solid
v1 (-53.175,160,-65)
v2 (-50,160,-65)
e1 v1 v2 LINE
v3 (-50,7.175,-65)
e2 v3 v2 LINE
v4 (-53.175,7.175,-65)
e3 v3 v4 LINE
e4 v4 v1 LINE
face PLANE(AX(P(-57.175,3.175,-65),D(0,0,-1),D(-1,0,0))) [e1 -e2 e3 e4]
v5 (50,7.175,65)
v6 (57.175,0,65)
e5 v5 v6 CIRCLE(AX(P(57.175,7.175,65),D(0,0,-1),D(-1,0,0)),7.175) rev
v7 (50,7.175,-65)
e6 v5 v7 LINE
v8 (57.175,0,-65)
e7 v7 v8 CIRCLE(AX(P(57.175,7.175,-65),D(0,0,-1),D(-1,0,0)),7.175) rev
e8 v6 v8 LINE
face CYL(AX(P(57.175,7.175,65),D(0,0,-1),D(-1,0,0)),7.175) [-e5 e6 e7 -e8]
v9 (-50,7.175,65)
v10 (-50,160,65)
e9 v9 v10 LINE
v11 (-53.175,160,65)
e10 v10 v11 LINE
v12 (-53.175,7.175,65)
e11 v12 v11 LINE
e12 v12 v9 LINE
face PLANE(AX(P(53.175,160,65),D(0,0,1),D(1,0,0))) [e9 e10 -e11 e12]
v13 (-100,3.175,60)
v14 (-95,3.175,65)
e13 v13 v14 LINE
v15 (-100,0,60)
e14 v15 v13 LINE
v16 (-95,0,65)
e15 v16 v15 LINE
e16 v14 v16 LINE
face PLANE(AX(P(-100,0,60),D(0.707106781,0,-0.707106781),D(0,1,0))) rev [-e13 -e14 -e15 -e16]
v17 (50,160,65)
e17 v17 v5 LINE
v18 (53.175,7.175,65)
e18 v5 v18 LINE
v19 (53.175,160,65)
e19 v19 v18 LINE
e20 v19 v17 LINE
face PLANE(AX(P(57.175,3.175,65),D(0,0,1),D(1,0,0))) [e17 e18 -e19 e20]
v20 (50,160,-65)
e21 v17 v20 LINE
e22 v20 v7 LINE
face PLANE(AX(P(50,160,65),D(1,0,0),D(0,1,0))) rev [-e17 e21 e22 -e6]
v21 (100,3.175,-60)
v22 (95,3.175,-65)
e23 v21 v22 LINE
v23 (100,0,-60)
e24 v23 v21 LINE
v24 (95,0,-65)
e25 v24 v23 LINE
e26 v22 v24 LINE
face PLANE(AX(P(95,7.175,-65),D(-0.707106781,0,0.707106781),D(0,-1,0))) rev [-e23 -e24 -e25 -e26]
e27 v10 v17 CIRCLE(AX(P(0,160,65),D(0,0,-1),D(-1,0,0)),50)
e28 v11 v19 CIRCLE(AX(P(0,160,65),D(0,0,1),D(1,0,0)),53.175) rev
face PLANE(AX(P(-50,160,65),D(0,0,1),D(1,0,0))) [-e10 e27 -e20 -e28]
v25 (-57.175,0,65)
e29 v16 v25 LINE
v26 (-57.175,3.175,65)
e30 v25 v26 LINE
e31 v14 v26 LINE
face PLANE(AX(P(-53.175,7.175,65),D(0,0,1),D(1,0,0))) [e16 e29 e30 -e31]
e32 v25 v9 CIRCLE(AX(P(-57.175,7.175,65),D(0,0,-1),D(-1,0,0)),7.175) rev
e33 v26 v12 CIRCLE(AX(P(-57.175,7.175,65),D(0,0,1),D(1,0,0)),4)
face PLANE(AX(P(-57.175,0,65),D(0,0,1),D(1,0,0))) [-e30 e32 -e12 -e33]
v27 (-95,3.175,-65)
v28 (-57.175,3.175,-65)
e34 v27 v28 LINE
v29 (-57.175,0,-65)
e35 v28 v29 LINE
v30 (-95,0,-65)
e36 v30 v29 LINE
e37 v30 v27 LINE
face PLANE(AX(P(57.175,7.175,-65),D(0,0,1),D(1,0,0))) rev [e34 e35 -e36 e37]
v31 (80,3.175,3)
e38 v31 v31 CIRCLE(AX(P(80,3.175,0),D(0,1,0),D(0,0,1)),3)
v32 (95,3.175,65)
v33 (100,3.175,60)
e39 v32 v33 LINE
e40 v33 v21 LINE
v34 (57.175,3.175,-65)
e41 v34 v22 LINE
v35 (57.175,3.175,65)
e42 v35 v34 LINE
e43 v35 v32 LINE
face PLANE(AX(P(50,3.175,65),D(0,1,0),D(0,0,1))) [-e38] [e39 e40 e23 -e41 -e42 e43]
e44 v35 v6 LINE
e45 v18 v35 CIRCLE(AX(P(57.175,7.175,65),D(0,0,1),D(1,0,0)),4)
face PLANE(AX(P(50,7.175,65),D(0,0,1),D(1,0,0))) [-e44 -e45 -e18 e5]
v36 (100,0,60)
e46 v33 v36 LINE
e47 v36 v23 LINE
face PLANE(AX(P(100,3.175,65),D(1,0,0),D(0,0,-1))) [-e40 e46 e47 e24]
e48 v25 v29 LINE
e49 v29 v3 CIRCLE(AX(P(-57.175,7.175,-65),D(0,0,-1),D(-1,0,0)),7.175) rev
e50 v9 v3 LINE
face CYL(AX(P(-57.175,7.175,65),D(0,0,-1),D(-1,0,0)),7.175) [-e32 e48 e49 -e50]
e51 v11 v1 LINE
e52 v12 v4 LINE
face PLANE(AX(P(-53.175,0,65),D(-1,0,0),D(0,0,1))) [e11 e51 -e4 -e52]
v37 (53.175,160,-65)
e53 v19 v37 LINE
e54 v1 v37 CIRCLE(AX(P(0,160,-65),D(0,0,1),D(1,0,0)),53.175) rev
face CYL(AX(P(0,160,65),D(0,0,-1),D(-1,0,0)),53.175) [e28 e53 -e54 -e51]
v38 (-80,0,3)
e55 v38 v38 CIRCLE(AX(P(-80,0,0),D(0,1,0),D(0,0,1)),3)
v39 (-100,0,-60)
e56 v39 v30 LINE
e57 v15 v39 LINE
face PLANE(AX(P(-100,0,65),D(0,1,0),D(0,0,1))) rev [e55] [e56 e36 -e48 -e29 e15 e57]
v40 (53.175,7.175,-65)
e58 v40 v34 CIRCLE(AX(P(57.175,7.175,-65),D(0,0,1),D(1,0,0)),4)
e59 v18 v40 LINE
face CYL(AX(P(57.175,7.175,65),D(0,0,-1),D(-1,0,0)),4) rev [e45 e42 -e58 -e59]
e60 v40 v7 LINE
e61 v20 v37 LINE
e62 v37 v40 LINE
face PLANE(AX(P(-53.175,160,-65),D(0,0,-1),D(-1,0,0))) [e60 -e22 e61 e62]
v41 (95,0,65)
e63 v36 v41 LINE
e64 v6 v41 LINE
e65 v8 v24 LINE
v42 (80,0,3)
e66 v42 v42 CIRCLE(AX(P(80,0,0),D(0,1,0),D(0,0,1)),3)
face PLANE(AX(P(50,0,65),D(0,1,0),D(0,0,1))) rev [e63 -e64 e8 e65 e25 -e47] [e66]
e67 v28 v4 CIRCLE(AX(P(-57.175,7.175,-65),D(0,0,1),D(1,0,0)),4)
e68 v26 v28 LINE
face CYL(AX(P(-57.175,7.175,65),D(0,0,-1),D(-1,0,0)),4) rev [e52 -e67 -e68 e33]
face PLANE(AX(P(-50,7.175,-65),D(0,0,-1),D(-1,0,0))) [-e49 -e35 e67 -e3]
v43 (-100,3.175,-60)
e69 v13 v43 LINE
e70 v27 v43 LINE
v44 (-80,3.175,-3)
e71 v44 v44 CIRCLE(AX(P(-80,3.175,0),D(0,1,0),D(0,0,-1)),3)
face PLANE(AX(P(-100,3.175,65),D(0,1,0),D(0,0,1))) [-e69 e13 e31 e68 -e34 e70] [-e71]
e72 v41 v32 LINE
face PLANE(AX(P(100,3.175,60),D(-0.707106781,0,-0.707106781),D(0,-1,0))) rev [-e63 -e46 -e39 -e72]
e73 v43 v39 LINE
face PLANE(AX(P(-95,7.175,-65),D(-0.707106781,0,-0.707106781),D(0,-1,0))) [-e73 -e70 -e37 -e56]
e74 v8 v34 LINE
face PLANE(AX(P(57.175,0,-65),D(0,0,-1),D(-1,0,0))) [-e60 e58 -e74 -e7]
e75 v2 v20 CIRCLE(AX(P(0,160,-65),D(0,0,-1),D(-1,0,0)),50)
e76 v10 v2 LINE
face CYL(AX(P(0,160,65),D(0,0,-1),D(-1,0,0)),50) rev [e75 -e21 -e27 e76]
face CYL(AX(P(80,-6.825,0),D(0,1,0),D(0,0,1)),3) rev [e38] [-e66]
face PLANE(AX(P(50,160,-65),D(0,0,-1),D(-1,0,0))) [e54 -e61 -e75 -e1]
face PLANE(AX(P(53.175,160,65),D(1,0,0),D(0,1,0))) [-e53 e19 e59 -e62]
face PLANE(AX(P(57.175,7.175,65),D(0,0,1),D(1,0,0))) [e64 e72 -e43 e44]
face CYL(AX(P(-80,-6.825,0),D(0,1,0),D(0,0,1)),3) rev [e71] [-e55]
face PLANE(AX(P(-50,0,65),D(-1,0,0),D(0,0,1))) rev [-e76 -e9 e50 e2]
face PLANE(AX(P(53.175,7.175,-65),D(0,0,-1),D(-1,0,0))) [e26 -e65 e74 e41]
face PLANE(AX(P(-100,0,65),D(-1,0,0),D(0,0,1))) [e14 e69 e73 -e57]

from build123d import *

# Parameters (mm, degrees)
BASE_FLANGE1_DEPTH = 65
SKETCH6_R          = 3
CUT_EXTRUDE1_DEPTH = 10
CHAMFER1_SIZE      = 5


# Sheet-metal steps are written as plain solids
with BuildPart() as part:
    # Sketch1 → Base-Flange1 (new, symmetric)
    with BuildSketch(Plane.XY):
        with BuildLine():
            Line((-100, 0), (-57.175, 0))
            ThreePointArc((-57.175, 0), (-52.101508845, 2.101508845), (-50, 7.175))
            Line((-50, 7.175), (-50, 160))
            ThreePointArc((-50, 160), (0, 210), (50, 160))
            Line((50, 160), (50, 7.175))
            ThreePointArc((50, 7.175), (52.101508845, 2.101508845), (57.175, 0))
            Line((57.175, 0), (100, 0))
            Line((100, 0), (100, 3.175))
            Line((100, 3.175), (57.175, 3.175))
            ThreePointArc((57.175, 3.175), (54.346572875, 4.346572875), (53.175, 7.175))
            Line((53.175, 7.175), (53.175, 160))
            ThreePointArc((53.175, 160), (0, 213.175), (-53.175, 160))
            Line((-53.175, 160), (-53.175, 7.175))
            ThreePointArc((-53.175, 7.175), (-54.346572875, 4.346572875), (-57.175, 3.175))
            Line((-57.175, 3.175), (-100, 3.175))
            Line((-100, 3.175), (-100, 0))
        make_face()
    extrude(amount=BASE_FLANGE1_DEPTH, both=True)

    # Sketch6 → Cut-Extrude1 (cut)
    with BuildSketch(Plane(origin=(0, 3.175, 0), x_dir=(1, 0, 0), z_dir=(0, 1, 0))):
        with Locations(Location((80, 0, 0), (0, 0, 270))):
            Circle(SKETCH6_R)
        with Locations(Location((-80, 0, 0), (0, 0, 270))):
            Circle(SKETCH6_R)
    extrude(amount=-CUT_EXTRUDE1_DEPTH, mode=Mode.SUBTRACT)

    # Chamfer1
    chamfer1_edges = [part.edges().sort_by_distance(p)[0] for p in [
        (-100, 1.5875, -65),
        (100, 1.5875, -65),
        (-100, 1.5875, 65),
        (100, 1.5875, 65),
    ]]
    chamfer(chamfer1_edges, length=CHAMFER1_SIZE)


solid = part.part
